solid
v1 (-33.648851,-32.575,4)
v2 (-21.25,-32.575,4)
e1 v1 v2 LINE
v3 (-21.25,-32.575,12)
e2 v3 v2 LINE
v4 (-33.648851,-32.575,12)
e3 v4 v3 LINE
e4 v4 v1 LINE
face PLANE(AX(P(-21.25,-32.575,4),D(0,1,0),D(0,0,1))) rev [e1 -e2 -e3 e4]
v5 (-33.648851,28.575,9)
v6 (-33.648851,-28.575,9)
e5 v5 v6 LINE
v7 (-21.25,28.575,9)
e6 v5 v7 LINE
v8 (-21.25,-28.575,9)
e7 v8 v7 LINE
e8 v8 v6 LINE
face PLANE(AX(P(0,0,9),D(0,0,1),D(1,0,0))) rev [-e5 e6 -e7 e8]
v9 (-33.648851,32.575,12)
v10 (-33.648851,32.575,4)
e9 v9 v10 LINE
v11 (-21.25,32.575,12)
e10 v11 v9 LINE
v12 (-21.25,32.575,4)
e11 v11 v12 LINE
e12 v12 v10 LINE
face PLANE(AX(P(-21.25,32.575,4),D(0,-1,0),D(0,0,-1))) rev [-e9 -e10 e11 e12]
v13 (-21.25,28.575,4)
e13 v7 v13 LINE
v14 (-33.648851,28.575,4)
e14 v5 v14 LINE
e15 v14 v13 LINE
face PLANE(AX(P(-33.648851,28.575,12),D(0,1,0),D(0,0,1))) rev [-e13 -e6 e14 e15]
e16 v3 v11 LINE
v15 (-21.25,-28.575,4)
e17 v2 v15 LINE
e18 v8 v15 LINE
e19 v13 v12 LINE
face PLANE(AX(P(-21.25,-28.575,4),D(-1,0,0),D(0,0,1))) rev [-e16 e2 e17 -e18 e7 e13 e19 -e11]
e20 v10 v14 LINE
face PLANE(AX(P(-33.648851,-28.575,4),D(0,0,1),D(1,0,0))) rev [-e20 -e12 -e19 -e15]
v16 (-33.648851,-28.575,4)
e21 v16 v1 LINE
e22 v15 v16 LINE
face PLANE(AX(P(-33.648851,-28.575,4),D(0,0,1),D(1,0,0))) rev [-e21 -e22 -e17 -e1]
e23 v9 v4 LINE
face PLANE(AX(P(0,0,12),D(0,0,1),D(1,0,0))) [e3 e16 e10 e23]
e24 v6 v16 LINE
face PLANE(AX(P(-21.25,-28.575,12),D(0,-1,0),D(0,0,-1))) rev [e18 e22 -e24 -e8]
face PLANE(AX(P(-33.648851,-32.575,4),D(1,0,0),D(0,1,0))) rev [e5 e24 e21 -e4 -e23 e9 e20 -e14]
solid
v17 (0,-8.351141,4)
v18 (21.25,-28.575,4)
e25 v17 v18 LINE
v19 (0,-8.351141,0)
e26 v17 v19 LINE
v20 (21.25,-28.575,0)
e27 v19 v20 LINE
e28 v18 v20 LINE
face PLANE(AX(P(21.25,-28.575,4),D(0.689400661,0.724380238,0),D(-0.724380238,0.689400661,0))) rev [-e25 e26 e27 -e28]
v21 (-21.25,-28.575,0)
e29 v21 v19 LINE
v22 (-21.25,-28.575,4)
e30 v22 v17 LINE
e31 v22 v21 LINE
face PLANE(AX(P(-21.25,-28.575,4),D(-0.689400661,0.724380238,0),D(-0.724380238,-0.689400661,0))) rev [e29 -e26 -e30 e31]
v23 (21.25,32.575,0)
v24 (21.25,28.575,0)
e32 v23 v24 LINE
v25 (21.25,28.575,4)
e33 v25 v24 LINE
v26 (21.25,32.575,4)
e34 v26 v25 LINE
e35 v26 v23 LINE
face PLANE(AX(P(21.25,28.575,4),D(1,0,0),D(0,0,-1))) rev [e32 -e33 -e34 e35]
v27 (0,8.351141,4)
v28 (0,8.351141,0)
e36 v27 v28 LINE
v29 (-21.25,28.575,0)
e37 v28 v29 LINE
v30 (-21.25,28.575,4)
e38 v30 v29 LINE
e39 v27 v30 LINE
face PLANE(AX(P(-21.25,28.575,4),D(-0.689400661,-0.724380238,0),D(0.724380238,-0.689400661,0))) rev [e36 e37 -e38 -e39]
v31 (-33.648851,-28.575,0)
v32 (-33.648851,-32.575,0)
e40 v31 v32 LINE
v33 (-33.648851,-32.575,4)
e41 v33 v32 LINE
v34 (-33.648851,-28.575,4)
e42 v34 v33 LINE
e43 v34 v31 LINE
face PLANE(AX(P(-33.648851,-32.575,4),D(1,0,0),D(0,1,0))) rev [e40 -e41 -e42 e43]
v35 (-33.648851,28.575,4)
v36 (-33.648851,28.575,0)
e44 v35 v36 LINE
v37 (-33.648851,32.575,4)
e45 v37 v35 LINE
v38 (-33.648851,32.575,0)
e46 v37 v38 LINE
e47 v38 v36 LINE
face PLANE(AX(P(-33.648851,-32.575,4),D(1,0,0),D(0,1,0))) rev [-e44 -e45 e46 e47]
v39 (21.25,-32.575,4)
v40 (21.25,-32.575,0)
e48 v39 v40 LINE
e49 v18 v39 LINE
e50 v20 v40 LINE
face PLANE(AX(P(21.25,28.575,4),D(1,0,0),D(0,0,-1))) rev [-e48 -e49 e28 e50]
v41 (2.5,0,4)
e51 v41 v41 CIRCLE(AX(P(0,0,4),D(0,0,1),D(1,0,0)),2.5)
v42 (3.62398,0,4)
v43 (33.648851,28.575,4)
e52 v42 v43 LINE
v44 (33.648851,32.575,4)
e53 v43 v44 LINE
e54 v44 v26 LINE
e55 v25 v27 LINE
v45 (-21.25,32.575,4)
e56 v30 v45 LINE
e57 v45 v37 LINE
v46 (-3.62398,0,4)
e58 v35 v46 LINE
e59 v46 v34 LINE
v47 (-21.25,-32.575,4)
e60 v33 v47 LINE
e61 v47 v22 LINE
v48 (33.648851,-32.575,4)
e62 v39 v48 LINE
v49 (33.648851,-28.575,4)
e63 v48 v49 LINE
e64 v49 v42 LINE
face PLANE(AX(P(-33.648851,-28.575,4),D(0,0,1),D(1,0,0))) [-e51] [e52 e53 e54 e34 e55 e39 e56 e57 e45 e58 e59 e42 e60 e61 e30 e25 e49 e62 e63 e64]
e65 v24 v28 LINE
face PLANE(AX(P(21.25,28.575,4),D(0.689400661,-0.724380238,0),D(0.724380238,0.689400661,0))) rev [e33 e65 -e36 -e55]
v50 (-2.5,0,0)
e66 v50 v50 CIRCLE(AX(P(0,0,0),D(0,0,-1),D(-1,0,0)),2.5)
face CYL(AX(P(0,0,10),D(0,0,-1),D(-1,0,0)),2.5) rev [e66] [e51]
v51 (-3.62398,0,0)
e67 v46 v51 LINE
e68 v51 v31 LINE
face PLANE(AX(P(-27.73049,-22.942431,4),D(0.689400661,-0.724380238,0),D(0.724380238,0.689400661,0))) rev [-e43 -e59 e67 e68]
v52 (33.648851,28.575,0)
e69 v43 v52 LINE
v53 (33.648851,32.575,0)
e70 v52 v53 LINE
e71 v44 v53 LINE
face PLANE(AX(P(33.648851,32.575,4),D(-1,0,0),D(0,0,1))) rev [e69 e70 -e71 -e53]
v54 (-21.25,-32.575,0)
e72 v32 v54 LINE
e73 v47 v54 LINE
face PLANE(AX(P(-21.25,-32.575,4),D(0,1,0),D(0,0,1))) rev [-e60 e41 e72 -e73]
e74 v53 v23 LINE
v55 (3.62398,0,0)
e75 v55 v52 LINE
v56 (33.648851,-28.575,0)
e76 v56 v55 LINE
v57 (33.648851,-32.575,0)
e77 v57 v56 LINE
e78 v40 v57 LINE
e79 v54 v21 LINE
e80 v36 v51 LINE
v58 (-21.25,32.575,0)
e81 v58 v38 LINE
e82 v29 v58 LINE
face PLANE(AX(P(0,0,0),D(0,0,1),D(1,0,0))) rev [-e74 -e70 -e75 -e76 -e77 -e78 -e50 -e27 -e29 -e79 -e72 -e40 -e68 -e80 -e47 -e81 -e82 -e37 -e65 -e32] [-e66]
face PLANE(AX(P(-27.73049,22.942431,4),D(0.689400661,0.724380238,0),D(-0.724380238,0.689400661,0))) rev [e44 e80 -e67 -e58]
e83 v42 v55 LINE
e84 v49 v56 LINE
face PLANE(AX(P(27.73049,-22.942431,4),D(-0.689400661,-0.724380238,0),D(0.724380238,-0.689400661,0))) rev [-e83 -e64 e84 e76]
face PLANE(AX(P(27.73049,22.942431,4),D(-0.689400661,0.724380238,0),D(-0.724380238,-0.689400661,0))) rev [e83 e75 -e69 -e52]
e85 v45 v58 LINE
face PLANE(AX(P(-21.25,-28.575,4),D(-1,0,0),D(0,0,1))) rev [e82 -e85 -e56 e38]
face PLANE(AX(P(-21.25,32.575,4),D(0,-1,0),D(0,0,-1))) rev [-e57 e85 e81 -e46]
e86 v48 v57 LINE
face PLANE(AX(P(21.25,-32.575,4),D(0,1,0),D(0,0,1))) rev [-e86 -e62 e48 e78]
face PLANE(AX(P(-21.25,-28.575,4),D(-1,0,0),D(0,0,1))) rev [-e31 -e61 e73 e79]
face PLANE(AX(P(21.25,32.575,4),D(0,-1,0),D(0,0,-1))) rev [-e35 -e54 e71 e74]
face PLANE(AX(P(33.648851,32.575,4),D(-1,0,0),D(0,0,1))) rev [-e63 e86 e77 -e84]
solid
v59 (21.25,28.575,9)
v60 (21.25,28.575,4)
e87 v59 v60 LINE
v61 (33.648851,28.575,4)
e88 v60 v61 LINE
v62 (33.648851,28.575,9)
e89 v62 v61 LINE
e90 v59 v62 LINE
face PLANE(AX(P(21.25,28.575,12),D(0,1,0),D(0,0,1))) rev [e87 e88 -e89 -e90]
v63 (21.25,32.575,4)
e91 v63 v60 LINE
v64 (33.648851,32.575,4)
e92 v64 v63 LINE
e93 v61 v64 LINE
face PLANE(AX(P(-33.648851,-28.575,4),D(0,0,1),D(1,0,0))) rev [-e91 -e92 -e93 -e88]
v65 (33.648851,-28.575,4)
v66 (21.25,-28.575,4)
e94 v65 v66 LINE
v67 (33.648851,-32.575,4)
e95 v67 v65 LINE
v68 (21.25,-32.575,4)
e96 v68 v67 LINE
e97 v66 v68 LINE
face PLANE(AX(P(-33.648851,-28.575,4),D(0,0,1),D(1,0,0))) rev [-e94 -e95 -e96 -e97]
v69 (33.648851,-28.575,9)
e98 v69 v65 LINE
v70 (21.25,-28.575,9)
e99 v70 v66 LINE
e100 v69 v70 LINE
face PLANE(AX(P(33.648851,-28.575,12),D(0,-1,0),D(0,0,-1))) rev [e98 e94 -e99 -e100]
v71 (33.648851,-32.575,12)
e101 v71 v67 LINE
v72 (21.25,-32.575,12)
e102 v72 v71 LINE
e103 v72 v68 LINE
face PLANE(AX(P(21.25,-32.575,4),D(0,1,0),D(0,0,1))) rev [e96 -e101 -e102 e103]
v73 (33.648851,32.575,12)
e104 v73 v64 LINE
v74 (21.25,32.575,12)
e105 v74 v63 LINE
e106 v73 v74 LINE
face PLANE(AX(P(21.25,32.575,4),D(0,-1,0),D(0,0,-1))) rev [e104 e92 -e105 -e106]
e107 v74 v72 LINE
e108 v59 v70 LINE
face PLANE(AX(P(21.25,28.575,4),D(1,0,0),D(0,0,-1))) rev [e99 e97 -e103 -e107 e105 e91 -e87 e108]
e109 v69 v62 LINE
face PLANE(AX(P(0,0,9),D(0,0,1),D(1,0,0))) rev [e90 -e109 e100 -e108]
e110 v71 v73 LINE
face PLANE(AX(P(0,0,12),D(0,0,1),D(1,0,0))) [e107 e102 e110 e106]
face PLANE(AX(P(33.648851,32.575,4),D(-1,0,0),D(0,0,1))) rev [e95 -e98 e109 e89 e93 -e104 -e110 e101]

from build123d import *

# Parameters (mm, degrees)
DODANIE_WYCI_GNI_CIE1_DEPTH = 4
SZKIC2_W                    = 12.398850507
SZKIC2_H                    = 4
DODANIE_WYCI_GNI_CIE2_DEPTH = 8
SZKIC3_W                    = 12.398850507
SZKIC3_H                    = 65.15
DODANIE_WYCI_GNI_CIE3_DEPTH = 3
SZKIC4_R                    = 2.5
WYTNIJ_WYCI_GNI_CIE1_DEPTH  = 10


with BuildPart() as part:
    # Szkic1 → Dodanie-wyciągnięcie1 (new body)
    with BuildSketch(Plane.XY):
        Polygon((21.25, -28.575), (0, -8.351140655), (-21.25, -28.575), (-21.25, -32.575), (-33.648850507, -32.575), (-33.648850507, -28.575), (-27.730490071, -22.942431105), (-3.623980395, 0), (-27.730490071, 22.942431105), (-33.648850507, 28.575), (-33.648850507, 32.575), (-21.25, 32.575), (-21.25, 28.575), (0, 8.351140655), (21.25, 28.575), (21.25, 32.575), (33.648850507, 32.575), (33.648850507, 28.575), (27.730490071, 22.942431105), (3.623980395, 0), (27.730490071, -22.942431105), (33.648850507, -28.575), (33.648850507, -32.575), (21.25, -32.575), align=None)
    extrude(amount=DODANIE_WYCI_GNI_CIE1_DEPTH)

    # Szkic2 → Dodanie-wyciągnięcie2 (add)
    with BuildSketch(Plane.XY.offset(4)):
        with Locations((-27.449425253, 30.575)):
            Rectangle(SZKIC2_W, SZKIC2_H)
        with Locations((27.449425253, 30.575)):
            Rectangle(SZKIC2_W, SZKIC2_H)
        with Locations((27.449425253, -30.575)):
            Rectangle(SZKIC2_W, SZKIC2_H)
        with Locations((-27.449425253, -30.575)):
            Rectangle(SZKIC2_W, SZKIC2_H)
    extrude(amount=DODANIE_WYCI_GNI_CIE2_DEPTH)

    # Szkic3 → Dodanie-wyciągnięcie3 (add)
    with BuildSketch(Plane.XY.offset(12)):
        with Locations((-27.449425253, 0)):
            Rectangle(SZKIC3_W, SZKIC3_H)
        with Locations((27.449425253, 0)):
            Rectangle(SZKIC3_W, SZKIC3_H)
    extrude(amount=-DODANIE_WYCI_GNI_CIE3_DEPTH)


with BuildPart() as body_2:
    # Podziel1: the piece on the far side of the plane
    add(part.part)
    split(bisect_by=Plane.XY.offset(4), keep=Keep.BOTTOM)

    # Szkic4 → Wytnij-wyciągnięcie1 (cut)
    with BuildSketch(Plane(origin=(0, 0, 0), x_dir=(-1, 0, 0), z_dir=(0, 0, -1))):
        Circle(SZKIC4_R)
    extrude(amount=-WYTNIJ_WYCI_GNI_CIE1_DEPTH, mode=Mode.SUBTRACT)


with BuildPart() as part_1:
    add(part.part)

    # Podziel1
    split(bisect_by=Plane.XY.offset(4), keep=Keep.TOP)


solid = Compound([body_2.part, part_1.part])
